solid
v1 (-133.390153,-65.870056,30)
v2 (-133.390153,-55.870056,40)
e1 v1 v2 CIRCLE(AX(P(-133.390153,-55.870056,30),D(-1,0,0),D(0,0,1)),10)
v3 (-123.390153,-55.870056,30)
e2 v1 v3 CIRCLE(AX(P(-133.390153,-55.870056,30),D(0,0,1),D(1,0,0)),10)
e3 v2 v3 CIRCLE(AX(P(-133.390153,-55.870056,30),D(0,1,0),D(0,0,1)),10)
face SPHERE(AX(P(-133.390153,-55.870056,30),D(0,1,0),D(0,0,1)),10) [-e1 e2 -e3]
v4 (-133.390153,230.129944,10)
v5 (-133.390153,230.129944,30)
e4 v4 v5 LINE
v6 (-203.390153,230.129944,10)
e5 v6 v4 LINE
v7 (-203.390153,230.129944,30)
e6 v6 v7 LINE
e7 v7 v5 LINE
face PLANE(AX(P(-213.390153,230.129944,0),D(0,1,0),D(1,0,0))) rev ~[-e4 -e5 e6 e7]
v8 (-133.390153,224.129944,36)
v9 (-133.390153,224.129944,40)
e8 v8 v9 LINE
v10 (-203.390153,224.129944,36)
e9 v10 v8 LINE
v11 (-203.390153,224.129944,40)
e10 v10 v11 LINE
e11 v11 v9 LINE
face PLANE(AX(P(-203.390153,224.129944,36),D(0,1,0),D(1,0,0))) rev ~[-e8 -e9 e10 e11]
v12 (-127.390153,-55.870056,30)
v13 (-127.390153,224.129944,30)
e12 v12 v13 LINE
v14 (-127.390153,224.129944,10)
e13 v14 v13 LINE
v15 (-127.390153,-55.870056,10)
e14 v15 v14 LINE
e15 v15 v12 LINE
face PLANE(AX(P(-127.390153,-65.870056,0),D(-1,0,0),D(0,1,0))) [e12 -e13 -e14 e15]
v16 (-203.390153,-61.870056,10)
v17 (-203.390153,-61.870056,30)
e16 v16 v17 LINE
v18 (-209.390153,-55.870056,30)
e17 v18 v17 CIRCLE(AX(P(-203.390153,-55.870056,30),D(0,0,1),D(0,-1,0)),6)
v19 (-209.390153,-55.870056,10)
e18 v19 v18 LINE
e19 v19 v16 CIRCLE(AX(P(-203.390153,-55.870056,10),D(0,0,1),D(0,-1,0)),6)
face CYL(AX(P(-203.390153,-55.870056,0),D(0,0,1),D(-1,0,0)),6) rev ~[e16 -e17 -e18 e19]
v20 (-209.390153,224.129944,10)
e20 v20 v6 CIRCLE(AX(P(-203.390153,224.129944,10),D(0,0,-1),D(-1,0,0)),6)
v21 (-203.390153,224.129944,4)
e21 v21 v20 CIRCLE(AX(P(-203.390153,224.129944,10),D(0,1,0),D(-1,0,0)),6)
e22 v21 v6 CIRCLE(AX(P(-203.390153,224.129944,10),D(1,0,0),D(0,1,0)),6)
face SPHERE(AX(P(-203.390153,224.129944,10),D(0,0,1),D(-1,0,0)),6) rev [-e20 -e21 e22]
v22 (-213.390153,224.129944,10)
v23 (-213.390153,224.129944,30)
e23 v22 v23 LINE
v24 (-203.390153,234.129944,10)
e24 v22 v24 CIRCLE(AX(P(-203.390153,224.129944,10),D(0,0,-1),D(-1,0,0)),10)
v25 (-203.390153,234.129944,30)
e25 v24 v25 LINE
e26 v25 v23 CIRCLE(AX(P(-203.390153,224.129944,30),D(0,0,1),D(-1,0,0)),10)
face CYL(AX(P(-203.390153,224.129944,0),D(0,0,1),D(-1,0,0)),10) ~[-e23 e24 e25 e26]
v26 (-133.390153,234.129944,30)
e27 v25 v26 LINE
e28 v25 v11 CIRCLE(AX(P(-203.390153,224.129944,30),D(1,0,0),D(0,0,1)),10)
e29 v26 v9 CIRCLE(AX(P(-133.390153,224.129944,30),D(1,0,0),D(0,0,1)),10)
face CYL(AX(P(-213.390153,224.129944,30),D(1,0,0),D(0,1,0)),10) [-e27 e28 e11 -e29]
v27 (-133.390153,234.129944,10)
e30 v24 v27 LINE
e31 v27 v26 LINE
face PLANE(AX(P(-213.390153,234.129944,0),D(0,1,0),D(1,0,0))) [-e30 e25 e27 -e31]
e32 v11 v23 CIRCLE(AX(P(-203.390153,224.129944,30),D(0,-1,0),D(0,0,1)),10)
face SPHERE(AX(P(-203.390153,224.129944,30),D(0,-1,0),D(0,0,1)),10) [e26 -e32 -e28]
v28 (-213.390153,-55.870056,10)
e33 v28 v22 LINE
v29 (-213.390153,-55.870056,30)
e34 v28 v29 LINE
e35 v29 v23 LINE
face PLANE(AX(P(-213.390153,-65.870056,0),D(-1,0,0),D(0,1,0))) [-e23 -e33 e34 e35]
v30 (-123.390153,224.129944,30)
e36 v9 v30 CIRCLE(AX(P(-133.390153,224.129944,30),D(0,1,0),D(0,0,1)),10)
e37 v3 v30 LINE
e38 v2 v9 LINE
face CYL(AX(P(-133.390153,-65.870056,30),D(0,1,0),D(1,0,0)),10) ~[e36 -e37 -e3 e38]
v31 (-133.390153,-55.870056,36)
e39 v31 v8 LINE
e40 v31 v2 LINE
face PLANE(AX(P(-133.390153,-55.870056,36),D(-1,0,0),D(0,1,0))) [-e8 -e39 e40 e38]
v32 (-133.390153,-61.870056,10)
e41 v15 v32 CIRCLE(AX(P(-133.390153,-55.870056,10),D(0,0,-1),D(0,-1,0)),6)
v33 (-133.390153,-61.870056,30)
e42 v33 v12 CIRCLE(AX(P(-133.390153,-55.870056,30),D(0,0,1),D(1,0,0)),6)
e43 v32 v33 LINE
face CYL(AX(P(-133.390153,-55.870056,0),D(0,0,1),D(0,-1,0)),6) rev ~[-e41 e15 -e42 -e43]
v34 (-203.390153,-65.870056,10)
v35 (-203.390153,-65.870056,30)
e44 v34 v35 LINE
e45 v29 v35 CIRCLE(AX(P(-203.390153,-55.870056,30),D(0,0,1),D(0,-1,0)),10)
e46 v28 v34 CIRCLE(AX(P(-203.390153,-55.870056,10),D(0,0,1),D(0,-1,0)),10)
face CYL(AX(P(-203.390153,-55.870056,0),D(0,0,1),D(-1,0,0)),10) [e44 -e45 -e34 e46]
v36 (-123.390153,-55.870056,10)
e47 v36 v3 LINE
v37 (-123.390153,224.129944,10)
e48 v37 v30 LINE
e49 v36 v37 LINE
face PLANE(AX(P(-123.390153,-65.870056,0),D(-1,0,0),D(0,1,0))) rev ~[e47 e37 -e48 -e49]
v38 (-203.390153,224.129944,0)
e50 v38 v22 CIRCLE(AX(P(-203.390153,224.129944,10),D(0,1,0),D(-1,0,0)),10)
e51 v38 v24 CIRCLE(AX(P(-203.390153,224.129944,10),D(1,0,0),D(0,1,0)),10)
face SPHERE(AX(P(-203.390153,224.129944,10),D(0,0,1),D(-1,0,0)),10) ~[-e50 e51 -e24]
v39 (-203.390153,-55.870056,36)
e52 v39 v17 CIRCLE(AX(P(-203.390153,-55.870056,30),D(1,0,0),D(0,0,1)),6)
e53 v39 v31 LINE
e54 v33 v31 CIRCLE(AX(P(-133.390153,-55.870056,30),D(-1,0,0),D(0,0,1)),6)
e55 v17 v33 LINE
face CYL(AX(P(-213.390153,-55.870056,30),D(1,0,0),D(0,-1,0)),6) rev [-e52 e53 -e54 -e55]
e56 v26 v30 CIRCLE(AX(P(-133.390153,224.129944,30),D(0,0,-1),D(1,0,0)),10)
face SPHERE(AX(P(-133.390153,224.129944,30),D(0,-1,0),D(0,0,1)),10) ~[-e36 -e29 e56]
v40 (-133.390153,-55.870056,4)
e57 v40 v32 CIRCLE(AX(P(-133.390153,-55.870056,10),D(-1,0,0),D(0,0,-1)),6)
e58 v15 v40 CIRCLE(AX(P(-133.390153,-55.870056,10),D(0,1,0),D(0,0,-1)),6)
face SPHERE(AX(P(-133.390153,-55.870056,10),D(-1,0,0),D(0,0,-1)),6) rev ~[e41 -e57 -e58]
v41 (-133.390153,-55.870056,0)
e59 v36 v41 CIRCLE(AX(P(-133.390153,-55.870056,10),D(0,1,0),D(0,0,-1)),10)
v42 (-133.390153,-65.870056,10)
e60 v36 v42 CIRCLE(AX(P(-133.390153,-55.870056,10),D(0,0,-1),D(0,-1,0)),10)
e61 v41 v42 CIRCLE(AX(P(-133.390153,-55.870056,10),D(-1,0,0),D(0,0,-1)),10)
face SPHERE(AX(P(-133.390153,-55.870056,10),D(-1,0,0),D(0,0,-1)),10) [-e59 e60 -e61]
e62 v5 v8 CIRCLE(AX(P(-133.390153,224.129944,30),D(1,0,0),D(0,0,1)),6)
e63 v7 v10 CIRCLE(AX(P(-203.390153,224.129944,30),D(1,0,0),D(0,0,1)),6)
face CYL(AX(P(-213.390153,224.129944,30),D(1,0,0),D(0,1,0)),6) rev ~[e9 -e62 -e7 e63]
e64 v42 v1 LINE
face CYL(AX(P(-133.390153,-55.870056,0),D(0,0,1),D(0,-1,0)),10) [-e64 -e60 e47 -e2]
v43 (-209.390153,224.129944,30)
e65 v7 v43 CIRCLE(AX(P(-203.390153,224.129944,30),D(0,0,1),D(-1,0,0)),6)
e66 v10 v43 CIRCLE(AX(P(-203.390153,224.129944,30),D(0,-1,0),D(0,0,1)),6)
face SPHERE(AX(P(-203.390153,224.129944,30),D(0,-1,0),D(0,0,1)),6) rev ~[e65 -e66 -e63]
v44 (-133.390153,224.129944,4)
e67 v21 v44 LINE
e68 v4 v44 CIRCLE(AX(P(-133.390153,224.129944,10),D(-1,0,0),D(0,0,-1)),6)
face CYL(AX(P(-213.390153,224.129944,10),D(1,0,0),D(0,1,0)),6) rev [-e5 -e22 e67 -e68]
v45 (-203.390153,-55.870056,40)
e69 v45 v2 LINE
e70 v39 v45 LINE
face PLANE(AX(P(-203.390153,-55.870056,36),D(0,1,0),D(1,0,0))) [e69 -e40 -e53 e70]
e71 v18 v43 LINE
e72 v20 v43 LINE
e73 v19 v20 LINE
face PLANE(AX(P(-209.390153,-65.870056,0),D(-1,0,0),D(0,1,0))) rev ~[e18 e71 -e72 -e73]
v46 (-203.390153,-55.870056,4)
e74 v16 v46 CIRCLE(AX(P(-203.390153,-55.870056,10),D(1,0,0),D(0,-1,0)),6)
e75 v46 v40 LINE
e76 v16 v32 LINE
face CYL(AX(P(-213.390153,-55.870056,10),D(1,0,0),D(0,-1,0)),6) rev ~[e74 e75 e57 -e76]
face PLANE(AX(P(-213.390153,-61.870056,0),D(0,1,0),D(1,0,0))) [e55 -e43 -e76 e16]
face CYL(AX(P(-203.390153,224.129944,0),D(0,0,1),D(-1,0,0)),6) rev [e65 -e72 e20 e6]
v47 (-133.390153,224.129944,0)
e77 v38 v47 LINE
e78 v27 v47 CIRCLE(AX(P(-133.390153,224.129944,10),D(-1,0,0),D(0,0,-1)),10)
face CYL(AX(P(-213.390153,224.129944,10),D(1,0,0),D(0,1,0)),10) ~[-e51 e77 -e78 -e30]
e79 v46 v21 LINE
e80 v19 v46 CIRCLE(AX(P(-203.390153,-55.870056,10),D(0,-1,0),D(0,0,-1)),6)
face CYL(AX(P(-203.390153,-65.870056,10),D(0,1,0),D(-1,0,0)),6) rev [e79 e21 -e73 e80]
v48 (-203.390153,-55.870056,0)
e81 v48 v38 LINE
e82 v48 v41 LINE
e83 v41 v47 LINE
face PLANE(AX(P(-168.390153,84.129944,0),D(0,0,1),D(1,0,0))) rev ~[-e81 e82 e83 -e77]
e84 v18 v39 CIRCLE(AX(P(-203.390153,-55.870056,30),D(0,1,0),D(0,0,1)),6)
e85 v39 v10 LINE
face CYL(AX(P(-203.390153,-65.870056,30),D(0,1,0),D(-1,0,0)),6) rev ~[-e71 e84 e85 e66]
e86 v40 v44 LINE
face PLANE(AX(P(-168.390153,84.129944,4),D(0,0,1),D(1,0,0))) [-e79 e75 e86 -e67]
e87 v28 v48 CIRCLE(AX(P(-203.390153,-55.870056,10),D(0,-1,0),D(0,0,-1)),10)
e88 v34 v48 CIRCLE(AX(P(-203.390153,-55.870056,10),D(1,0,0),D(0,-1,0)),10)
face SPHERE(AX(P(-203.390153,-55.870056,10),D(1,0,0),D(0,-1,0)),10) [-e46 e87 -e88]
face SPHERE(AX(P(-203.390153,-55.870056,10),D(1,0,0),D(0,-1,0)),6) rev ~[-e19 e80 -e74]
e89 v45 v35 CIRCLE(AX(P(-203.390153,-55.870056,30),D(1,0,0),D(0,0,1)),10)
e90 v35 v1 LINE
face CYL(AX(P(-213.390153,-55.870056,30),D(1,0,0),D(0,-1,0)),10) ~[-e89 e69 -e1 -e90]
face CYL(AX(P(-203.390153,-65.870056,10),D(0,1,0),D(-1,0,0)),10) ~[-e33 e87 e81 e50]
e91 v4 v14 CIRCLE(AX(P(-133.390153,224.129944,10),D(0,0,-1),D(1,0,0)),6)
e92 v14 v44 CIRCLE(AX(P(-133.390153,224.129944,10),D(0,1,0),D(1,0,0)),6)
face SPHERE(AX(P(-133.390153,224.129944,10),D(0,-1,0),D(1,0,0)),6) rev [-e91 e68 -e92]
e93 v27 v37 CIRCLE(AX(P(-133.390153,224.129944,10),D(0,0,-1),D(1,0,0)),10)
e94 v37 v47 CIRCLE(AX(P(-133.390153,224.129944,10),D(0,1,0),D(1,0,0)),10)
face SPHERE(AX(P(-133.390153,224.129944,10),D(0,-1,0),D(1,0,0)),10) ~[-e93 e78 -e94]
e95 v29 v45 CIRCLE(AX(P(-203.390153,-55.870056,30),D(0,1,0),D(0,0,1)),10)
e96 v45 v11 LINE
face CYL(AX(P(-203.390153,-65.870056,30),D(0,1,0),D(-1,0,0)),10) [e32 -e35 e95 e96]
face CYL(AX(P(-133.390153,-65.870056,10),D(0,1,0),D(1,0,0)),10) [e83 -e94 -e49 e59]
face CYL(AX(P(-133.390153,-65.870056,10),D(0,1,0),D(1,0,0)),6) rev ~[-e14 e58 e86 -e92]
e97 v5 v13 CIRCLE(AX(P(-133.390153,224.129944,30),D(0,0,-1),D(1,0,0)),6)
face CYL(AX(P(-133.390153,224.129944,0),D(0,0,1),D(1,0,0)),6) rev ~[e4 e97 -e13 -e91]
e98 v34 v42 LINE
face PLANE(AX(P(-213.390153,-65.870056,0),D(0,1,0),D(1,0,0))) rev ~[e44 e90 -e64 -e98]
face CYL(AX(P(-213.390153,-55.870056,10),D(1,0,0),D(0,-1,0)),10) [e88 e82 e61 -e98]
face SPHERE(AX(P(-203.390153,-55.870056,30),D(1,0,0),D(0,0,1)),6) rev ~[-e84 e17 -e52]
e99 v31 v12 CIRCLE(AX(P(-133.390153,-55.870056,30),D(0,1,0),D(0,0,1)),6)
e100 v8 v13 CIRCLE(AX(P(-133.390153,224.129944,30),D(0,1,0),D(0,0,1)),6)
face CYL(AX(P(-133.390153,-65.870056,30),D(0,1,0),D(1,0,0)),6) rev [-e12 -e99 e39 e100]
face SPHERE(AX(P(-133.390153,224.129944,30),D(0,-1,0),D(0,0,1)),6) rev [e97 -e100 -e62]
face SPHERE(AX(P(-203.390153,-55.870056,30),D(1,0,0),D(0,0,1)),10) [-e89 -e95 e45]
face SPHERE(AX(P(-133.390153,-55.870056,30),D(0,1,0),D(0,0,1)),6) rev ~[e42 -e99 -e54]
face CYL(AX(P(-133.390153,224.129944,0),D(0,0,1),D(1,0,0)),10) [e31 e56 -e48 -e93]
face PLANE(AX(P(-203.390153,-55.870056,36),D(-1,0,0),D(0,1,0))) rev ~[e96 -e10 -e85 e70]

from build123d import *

# Parameters (mm, degrees)
F0_W     = 90
F0_H     = 300
F1_DEPTH = 40
F2_R     = 10
F3_T     = -4


# Not quite as in the source:
# - a shell that OpenCascade refuses in one call is made with other operations: the cavity is built on its own and cut out


with BuildPart() as f1:
    # F0 (on Top) → F1 (new body)
    with BuildSketch(Plane.XY):
        with Locations((-168.3901532187, 84.1299444437)):
            Rectangle(F0_W, F0_H)
    extrude(amount=F1_DEPTH)

    # F2
    f2_edges = [f1.edges().sort_by_distance(p)[0] for p in [
        (-123.390153, 84.129944, 40),
        (-168.390153, -65.870056, 40),
        (-213.390153, 84.129944, 40),
        (-168.390153, 234.129944, 40),
        (-168.390153, -65.870056, 0),
        (-123.390153, 84.129944, 0),
        (-123.390153, 234.129944, 20),
        (-123.390153, -65.870056, 20),
        (-213.390153, -65.870056, 20),
        (-213.390153, 234.129944, 20),
        (-213.390153, 84.129944, 0),
        (-168.390153, 234.129944, 0),
    ]]
    fillet(f2_edges, radius=F2_R)

    # F3: a shell. OpenCascade refuses it in one call, so the cavity is built on its own and cut out:
    # the body offset inwards by the wall thickness, plus a prism from it out through each open face.
    f3_core = offset(f1.part, amount=F3_T, mode=Mode.PRIVATE)
    f3_exits = [f3_core.faces().sort_by_distance(p)[0] for p in [
        (-168.390153, 84.129944, 36),
    ]]
    add(f3_core, mode=Mode.SUBTRACT)
    extrude(f3_exits, amount=-F3_T, mode=Mode.SUBTRACT)


solid = f1.part
